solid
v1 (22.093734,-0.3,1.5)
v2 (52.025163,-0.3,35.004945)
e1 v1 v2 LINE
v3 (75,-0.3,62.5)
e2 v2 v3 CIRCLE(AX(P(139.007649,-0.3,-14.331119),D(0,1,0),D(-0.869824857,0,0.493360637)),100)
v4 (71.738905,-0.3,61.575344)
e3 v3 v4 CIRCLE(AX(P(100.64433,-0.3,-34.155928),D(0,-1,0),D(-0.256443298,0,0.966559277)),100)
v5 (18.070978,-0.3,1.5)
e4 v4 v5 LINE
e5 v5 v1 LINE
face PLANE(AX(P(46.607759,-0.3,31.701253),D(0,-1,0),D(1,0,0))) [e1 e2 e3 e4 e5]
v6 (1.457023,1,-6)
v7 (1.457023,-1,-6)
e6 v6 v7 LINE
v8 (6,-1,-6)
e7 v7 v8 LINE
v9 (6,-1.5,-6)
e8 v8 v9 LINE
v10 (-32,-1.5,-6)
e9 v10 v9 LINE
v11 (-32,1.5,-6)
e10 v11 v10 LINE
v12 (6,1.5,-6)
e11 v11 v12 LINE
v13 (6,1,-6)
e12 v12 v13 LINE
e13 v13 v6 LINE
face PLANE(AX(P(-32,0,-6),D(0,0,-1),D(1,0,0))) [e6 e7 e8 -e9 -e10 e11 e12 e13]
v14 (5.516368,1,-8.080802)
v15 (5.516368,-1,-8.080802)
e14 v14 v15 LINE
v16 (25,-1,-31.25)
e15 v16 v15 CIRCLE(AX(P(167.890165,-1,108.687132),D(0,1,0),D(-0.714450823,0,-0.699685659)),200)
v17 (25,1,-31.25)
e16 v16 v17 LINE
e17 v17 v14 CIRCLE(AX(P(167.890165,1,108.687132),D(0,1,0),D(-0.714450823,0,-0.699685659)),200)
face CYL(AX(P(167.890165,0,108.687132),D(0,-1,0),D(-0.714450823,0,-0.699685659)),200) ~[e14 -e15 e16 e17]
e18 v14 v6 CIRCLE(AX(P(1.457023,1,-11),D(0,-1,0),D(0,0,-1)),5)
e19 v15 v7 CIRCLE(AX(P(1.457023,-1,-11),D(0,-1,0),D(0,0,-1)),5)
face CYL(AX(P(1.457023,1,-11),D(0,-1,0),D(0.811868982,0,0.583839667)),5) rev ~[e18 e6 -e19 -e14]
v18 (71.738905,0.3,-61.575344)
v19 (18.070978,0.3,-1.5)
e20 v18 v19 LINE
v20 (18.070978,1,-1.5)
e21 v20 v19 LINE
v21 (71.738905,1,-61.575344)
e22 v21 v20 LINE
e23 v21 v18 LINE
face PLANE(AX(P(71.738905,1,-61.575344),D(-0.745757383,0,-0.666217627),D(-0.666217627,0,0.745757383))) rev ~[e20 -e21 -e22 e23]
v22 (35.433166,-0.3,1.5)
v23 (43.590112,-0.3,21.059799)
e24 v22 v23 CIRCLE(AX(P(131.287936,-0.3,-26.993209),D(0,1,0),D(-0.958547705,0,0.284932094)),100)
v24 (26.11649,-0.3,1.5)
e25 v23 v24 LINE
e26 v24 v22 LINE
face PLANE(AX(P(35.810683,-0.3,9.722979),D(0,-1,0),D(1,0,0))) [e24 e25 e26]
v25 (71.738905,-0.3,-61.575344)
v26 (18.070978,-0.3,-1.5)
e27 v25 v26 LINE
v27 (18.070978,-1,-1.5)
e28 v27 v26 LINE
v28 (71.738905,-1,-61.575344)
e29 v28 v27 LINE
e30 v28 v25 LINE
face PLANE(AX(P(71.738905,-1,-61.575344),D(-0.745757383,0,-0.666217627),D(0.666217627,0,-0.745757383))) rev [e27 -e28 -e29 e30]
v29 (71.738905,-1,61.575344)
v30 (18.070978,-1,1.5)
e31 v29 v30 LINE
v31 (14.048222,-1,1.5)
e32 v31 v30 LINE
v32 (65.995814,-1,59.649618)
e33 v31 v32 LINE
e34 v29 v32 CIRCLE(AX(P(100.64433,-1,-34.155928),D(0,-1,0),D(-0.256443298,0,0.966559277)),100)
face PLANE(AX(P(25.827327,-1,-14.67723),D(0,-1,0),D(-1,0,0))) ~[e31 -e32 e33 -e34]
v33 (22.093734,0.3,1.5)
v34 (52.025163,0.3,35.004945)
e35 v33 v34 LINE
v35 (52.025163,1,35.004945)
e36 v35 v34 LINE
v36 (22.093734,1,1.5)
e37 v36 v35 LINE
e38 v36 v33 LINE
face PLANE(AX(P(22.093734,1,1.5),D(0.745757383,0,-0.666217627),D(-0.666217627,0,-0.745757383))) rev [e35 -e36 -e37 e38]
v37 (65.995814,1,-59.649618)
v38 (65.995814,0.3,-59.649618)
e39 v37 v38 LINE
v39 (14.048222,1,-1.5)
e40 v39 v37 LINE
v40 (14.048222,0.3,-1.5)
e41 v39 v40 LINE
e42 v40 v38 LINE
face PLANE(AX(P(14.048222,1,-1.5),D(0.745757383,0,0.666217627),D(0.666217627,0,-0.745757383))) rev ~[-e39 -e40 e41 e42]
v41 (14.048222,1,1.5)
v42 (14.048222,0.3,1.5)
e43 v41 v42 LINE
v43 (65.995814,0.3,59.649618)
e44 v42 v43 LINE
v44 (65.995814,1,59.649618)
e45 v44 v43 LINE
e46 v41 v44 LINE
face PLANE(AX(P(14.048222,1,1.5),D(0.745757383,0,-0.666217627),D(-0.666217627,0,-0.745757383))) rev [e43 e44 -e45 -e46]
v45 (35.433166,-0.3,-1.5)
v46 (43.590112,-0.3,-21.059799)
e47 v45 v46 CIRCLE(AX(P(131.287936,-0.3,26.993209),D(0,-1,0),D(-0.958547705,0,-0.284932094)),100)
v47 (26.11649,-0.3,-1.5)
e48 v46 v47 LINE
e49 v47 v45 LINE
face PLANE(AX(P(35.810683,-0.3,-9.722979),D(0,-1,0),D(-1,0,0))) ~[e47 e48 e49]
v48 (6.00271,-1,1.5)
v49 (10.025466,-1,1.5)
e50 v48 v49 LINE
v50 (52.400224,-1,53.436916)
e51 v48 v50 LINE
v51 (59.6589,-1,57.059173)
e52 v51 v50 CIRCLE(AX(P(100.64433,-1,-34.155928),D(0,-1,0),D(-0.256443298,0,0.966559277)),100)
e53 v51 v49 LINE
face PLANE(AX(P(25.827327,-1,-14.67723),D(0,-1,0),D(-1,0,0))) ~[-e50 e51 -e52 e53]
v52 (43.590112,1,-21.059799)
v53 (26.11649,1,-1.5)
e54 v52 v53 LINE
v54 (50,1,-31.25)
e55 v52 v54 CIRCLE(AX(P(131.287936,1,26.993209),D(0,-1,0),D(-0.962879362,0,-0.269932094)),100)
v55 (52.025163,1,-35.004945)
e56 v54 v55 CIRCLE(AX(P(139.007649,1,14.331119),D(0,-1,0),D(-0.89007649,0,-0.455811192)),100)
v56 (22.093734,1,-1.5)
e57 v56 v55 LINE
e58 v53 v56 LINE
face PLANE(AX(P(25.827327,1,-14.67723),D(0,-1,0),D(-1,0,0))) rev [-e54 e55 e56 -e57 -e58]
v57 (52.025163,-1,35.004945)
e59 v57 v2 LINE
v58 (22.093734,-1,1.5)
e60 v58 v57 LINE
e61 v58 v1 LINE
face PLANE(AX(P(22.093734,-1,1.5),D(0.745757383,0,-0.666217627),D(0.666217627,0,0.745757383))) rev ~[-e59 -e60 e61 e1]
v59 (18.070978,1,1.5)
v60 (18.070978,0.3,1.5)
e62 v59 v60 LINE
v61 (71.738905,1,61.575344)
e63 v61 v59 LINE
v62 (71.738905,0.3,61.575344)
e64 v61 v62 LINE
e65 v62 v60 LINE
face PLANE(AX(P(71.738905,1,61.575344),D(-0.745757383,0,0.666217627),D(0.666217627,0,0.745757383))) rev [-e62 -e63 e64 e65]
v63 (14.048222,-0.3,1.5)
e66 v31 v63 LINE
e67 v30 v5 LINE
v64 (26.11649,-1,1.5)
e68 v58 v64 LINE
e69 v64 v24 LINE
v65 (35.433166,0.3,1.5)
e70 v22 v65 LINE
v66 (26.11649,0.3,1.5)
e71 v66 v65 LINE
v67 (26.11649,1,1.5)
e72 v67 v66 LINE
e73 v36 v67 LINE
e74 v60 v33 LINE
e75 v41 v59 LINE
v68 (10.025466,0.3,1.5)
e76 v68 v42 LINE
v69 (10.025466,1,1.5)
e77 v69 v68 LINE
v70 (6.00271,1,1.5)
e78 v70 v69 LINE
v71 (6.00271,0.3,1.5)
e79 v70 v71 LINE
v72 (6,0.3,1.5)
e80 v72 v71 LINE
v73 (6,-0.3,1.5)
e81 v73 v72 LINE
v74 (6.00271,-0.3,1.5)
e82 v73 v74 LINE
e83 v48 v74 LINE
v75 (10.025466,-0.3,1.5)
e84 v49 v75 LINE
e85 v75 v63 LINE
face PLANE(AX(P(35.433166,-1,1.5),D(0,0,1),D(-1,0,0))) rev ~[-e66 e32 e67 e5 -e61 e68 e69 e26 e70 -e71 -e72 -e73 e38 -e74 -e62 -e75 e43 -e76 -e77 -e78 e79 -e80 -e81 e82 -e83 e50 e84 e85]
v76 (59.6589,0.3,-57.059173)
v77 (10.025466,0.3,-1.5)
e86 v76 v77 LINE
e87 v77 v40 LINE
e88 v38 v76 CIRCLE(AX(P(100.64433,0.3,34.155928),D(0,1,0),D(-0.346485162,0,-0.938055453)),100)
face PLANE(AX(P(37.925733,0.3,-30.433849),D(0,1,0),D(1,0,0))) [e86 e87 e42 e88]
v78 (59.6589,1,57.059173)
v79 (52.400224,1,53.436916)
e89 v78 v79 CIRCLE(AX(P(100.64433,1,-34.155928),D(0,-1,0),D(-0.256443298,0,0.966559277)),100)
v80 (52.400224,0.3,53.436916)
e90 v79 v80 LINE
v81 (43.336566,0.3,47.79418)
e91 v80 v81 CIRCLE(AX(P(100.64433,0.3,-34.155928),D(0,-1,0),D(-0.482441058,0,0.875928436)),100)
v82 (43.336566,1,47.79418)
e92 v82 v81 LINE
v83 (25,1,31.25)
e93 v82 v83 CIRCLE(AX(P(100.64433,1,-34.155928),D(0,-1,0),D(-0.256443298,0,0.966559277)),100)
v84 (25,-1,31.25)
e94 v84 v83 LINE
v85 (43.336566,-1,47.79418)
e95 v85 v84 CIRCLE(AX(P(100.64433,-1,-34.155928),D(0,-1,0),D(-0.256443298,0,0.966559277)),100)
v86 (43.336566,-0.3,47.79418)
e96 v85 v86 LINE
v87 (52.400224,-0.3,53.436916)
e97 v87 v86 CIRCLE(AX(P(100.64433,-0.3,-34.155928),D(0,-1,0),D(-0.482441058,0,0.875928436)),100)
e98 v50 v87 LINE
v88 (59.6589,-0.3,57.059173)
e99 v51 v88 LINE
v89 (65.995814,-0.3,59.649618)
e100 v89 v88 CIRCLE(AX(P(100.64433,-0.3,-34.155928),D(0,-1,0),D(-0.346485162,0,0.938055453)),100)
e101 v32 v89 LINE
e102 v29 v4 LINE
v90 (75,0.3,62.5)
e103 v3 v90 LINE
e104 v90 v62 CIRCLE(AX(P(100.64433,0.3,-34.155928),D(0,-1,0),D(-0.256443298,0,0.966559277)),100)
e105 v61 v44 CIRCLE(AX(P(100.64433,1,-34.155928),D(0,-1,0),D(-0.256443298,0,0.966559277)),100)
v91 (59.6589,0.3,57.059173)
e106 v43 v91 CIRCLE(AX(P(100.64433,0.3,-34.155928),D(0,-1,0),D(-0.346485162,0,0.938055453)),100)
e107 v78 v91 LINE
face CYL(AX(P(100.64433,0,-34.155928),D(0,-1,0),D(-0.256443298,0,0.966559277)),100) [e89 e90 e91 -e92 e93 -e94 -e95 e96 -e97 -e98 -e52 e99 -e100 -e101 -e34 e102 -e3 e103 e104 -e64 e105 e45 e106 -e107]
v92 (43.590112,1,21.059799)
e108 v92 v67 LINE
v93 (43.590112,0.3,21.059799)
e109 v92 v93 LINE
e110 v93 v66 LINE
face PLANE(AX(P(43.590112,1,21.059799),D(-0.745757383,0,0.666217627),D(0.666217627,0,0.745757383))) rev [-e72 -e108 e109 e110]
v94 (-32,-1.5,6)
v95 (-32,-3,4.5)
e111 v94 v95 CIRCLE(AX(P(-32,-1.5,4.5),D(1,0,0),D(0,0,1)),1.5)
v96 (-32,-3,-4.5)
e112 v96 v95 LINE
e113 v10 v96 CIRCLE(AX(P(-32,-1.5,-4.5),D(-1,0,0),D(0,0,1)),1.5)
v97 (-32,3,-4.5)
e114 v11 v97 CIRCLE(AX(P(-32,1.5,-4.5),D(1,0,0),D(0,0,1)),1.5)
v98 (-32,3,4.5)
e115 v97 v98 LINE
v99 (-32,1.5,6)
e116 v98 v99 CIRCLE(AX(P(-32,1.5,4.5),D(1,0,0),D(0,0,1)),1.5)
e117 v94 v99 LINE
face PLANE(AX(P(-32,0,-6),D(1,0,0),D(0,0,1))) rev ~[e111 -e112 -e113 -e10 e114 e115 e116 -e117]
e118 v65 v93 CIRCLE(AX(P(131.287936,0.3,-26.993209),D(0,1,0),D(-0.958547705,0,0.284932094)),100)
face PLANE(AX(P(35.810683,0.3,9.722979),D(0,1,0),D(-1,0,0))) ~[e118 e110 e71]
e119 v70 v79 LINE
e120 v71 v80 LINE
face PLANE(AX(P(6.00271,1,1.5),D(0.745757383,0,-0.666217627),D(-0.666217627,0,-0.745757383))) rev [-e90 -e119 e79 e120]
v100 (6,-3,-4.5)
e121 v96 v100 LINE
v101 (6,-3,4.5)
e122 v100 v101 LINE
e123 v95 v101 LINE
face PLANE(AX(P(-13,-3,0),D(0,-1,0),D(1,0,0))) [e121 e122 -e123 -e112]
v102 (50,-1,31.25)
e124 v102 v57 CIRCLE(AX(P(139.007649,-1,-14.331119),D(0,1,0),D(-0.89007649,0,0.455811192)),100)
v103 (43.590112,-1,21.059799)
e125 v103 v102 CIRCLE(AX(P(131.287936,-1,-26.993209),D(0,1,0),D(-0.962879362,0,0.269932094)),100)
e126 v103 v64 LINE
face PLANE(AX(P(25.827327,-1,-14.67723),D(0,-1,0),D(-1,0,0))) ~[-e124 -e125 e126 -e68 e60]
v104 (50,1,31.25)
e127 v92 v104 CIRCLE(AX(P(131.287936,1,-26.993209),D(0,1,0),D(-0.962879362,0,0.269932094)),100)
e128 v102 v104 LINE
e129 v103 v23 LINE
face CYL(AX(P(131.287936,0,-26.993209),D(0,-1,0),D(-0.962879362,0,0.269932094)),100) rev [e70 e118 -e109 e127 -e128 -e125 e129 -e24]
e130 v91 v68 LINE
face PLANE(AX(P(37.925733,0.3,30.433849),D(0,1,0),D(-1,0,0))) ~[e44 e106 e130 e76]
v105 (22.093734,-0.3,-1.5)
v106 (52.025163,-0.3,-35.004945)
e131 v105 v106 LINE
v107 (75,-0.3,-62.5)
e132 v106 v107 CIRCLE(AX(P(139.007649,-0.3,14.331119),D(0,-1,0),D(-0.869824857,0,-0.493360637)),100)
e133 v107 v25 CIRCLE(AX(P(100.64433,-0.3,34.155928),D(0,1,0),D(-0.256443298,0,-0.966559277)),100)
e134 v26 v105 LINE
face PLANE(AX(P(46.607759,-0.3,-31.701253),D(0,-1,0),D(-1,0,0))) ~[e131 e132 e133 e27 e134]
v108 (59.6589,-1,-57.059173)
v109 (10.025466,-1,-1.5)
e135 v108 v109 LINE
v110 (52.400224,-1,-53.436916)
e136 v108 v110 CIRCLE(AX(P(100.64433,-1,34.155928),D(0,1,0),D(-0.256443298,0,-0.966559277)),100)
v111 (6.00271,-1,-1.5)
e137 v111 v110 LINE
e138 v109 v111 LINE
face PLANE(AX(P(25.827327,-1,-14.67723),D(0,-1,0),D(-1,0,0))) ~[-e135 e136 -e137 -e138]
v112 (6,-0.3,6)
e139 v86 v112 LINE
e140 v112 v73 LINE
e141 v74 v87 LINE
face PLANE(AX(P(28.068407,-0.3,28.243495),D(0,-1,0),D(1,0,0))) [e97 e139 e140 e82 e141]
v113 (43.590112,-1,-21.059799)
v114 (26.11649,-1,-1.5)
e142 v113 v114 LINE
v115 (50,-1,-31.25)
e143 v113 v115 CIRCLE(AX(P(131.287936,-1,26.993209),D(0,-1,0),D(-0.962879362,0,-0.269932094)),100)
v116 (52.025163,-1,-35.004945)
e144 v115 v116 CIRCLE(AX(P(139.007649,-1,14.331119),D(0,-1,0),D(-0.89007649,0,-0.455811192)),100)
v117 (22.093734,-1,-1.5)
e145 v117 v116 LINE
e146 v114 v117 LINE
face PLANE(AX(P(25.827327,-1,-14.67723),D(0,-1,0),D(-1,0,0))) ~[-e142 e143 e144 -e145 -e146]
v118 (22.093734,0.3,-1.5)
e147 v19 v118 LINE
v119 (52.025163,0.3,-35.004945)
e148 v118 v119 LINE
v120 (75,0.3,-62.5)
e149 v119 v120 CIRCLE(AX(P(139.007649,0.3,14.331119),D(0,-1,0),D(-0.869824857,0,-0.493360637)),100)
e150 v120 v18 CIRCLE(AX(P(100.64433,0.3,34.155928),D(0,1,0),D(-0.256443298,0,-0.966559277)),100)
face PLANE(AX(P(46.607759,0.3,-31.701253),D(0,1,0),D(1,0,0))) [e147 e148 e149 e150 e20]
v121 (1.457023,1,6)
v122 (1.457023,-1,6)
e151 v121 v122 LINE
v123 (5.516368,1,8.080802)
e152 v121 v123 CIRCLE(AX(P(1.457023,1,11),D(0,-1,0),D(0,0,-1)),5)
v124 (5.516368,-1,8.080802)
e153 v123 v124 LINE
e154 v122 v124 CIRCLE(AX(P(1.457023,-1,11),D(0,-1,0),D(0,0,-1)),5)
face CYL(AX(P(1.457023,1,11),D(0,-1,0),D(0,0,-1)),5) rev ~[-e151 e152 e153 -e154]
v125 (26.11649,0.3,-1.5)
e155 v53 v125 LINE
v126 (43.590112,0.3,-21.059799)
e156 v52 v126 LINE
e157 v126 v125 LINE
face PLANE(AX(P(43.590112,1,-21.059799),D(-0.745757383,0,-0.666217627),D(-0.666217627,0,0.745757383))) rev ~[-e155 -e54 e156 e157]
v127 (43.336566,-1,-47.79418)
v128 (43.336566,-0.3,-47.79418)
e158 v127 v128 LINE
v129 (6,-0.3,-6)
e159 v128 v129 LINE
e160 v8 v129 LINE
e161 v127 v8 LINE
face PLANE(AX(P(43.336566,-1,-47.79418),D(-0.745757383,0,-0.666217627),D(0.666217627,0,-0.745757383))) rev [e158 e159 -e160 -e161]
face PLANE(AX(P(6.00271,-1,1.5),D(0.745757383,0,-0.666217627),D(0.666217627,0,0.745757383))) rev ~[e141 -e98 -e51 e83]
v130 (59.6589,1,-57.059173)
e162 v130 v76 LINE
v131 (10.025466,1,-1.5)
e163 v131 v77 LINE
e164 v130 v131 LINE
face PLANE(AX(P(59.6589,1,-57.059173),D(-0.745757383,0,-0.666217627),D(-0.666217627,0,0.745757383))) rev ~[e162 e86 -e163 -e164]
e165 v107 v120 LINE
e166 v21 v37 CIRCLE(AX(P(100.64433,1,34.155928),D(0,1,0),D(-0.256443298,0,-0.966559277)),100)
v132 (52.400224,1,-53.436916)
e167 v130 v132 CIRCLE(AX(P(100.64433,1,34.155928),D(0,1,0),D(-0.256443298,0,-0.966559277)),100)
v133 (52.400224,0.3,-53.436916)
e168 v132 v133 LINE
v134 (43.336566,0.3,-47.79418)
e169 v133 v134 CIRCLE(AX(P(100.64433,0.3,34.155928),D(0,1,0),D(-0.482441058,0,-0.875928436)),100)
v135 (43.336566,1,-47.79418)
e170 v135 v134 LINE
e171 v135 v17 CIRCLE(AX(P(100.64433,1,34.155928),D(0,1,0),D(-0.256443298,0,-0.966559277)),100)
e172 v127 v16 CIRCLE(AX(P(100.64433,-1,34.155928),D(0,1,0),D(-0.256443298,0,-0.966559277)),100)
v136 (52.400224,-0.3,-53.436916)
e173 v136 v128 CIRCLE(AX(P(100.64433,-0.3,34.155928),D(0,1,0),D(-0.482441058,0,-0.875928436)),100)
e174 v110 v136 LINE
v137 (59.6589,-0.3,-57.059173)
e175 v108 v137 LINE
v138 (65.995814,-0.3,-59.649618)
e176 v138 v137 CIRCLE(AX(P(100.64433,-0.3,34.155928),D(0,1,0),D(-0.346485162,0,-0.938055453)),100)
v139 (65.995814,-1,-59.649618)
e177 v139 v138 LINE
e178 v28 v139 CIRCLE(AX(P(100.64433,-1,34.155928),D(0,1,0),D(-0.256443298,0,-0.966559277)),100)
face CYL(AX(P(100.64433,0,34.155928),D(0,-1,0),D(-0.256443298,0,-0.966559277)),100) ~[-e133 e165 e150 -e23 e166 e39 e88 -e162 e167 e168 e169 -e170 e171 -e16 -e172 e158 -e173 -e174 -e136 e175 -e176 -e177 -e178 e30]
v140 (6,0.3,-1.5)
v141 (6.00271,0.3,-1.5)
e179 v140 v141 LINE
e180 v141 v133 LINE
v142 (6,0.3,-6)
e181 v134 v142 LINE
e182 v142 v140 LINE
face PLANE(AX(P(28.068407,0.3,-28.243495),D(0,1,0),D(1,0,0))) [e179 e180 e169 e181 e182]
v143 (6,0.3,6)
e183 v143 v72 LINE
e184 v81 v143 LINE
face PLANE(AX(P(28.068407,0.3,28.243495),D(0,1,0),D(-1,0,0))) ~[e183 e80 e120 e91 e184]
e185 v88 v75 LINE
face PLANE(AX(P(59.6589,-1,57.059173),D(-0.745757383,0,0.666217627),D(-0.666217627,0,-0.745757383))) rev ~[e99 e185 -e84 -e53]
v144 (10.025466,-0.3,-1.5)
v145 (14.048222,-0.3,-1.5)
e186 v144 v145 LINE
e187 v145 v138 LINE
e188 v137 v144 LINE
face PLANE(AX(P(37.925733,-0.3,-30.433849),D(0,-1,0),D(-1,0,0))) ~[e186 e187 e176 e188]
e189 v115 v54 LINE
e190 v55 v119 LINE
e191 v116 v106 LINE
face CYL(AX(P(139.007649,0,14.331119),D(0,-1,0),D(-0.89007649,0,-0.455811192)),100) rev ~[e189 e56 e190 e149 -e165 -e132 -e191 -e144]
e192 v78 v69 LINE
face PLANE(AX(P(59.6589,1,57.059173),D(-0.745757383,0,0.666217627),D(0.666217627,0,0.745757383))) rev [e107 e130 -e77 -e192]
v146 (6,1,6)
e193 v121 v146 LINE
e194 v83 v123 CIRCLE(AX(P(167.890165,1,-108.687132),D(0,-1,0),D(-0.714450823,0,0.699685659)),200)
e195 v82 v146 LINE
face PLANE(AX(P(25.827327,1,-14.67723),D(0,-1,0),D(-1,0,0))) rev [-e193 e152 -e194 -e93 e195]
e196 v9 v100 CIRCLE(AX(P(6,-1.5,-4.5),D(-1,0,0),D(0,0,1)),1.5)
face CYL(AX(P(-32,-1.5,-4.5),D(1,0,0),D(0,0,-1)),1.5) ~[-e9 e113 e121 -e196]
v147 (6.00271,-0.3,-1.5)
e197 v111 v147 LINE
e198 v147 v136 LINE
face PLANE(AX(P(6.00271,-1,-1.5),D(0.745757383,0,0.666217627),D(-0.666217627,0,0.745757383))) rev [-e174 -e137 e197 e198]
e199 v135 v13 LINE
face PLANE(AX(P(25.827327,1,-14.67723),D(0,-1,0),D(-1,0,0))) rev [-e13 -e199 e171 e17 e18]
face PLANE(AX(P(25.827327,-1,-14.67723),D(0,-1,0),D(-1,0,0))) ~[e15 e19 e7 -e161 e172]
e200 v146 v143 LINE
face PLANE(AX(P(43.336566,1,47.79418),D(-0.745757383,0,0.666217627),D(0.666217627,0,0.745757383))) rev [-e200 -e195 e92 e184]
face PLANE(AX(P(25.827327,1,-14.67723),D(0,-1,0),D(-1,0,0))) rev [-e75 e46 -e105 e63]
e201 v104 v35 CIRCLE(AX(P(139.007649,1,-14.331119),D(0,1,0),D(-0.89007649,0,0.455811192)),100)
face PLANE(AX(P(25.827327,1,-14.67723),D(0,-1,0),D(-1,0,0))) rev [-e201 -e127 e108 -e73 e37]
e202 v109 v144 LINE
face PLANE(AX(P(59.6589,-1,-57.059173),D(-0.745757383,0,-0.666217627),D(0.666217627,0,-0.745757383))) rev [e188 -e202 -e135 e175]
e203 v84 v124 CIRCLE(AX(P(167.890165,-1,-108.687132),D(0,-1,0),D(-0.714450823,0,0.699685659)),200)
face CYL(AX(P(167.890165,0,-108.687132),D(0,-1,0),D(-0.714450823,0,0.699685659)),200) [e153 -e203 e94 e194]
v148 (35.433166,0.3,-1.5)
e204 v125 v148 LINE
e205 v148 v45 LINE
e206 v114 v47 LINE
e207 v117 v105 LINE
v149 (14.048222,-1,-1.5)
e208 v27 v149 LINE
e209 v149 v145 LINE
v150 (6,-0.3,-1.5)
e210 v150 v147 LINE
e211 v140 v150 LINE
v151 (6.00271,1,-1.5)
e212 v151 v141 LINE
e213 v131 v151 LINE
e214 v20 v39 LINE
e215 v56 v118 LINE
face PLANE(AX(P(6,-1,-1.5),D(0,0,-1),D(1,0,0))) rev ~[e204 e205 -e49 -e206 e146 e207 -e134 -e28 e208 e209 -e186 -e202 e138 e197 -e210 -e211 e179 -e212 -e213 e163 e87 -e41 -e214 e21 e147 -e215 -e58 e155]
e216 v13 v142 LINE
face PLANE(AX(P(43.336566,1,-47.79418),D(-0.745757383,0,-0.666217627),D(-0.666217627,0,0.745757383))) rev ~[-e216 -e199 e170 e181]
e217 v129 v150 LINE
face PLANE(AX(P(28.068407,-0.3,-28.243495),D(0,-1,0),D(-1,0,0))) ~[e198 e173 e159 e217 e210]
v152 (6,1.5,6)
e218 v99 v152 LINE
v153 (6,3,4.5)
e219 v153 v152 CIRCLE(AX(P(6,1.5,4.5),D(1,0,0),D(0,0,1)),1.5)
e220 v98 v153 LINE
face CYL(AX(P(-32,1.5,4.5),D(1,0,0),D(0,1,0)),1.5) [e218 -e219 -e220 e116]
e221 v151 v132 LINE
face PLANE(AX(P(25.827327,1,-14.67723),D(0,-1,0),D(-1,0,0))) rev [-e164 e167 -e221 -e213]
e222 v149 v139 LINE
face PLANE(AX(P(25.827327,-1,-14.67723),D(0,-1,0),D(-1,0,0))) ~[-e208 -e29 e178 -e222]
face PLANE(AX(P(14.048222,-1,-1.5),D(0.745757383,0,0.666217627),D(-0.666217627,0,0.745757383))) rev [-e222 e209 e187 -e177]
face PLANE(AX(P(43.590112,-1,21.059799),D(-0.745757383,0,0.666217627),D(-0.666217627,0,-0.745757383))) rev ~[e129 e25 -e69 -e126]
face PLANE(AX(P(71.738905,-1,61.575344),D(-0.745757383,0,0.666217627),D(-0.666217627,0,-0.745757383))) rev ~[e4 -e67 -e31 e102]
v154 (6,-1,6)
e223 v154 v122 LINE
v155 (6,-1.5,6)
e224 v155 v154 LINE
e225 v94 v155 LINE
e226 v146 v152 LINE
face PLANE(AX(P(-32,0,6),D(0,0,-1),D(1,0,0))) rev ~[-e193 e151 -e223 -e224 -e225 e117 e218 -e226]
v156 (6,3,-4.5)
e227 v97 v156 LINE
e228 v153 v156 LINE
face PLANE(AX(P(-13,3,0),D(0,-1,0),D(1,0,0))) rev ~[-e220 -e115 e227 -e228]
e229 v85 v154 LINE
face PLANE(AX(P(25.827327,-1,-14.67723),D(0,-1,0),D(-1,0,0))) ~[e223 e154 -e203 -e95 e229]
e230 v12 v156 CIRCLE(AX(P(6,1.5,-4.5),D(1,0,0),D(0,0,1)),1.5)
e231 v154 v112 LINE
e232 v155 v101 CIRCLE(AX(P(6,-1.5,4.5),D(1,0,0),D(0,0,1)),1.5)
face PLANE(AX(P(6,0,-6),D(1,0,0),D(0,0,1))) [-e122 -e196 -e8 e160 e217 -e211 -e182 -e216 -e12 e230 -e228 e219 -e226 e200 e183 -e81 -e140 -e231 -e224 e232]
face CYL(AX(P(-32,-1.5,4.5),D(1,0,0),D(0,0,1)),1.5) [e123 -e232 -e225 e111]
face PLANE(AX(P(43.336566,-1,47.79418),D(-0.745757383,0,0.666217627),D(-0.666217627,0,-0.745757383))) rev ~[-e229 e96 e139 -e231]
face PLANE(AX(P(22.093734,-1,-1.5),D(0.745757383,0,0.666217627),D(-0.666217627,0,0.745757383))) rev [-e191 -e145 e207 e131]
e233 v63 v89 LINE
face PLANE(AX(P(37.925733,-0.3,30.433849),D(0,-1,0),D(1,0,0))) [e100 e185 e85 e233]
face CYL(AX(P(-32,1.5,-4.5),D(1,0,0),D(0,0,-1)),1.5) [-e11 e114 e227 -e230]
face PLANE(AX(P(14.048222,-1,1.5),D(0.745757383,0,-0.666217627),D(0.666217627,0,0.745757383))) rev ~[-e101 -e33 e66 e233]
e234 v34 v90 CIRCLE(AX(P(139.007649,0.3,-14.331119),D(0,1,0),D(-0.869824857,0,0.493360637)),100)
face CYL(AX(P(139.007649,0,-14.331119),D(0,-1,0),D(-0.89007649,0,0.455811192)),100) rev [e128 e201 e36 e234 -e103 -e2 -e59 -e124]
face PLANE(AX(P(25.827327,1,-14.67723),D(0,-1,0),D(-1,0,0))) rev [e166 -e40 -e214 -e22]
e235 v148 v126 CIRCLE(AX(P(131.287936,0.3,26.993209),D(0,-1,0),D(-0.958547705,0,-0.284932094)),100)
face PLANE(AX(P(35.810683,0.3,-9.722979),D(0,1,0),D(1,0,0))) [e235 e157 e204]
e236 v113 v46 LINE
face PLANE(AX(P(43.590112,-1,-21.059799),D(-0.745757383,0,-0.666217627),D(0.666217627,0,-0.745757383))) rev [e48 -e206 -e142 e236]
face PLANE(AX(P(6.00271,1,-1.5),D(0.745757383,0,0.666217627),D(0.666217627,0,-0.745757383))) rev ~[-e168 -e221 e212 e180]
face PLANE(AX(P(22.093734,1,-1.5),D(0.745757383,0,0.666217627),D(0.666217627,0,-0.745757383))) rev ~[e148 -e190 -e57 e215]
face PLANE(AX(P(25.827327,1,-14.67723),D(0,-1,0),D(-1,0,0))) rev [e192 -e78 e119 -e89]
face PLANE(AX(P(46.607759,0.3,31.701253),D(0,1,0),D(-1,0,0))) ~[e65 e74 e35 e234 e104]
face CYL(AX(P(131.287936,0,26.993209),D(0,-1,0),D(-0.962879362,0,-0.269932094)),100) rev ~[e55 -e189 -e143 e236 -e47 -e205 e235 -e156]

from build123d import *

# Parameters (mm, degrees)
F1_DEPTH         = 1
F3_W             = 38
F3_H             = 12
F4_DEPTH         = 3
F5_R             = 1.5
F7_DEPTH         = 0.7
F7_COPIES2_COUNT = 2
F9_DEPTH         = 12.5
F10_R            = 5


# Not quite as in the source:
# - a pattern or mirror of a feature is missing from the dataset's text; its kind, count and spacing are read off the source's solid


with BuildPart() as f1:
    # F0 (on Front) → F1 (new body, symmetric)
    with BuildSketch(Plane.XZ):
        with BuildLine():
            ThreePointArc((25, 31.25), (11.7164027855, 16.2518777716), (0, 0))
            Line((0, 0), (35, 0))
            ThreePointArc((35, 0), (41.1356304071, 16.2798974046), (50, 31.25))
            Line((50, 31.25), (25, 31.25))
        make_face()
        with BuildLine():
            ThreePointArc((75, 62.5), (47.6444357815, 50.6439027497), (25, 31.25))
            Line((25, 31.25), (50, 31.25))
            ThreePointArc((50, 31.25), (60.9207680237, 48.138385581), (75, 62.5))
        make_face()
    extrude(amount=F1_DEPTH, both=True)

    # F2: F1 across plane


with BuildPart() as f1_1:
    add(f1.part)
    add(f1.part.mirror(Plane.XY))

    # F3 (on Front) → F4 (join, symmetric)
    with BuildSketch(Plane.XZ):
        with Locations((-13, 0)):
            Rectangle(F3_W, F3_H)
    extrude(amount=F4_DEPTH, both=True)

    # F5
    f5_edges = [f1_1.edges().sort_by_distance(p)[0] for p in [
        (-13, 3, 6),
        (-13, -3, 6),
        (-13, -3, -6),
        (-13, 3, -6),
    ]]
    fillet(f5_edges, radius=F5_R)

    # F6 (on face) → F7 (cut)
    with BuildSketch(Plane.XZ.offset(1)):
        with BuildLine():
            Line((43.3365657685, 47.794180243), (6, 6))
            Line((6, 6), (6, 1.5))
            Line((6, 1.5), (6.0027095677, 1.5))
            Line((6.0027095677, 1.5), (52.4002239395, 53.436915958))
            ThreePointArc((52.4002239395, 53.436915958), (47.7930343948, 50.7365960242), (43.3365657685, 47.794180243))
        make_face()
        with BuildLine():
            ThreePointArc((65.9958136081, 59.6496176381), (62.8051828619, 58.40863879), (59.6589001751, 57.0591728532))
            Line((59.6589001751, 57.0591728532), (10.0254655864, 1.5))
            Line((10.0254655864, 1.5), (14.0482216051, 1.5))
            Line((14.0482216051, 1.5), (65.9958136081, 59.6496176381))
        make_face()
        with BuildLine():
            ThreePointArc((75, 62.5), (73.3655345805, 62.0514906305), (71.738905371, 61.5753443538))
            Line((71.738905371, 61.5753443538), (18.0709776237, 1.5))
            Line((18.0709776237, 1.5), (22.0937336424, 1.5))
            Line((22.0937336424, 1.5), (52.0251632611, 35.0049445138))
            ThreePointArc((52.0251632611, 35.0049445138), (62.2710885073, 49.7898624827), (75, 62.5))
        make_face()
        with BuildLine():
            Line((43.5901115949, 21.0597985398), (26.1164896611, 1.5))
            Line((26.1164896611, 1.5), (35.4331656898, 1.5))
            ThreePointArc((35.4331656898, 1.5), (38.9920250058, 11.4965917024), (43.5901115949, 21.0597985398))
        make_face()
    f7 = extrude(amount=-F7_DEPTH, mode=Mode.SUBTRACT)

    # F7_copies: F7 across plane
    add(f7.mirror(Plane.ZX), mode=Mode.SUBTRACT)

    # F7_copies1: F7 across plane
    add(f7.mirror(Plane(origin=(0, 0, 0), x_dir=(-1, 0, 0), z_dir=(0, 0, -1))), mode=Mode.SUBTRACT)

    # F7_copies2: F7 ×2 about axis
    f7_copies2_axis = Axis((0, 0, 0), (1, 0, 0))
    for i in range(1, F7_COPIES2_COUNT):
        add(f7.rotate(f7_copies2_axis, i * 360 / F7_COPIES2_COUNT), mode=Mode.SUBTRACT)

    # F8 (on face) → F9 (cut, symmetric)
    with BuildSketch(Plane.XZ.offset(1)):
        with BuildLine():
            Line((6.0027095677, 1.5), (6, 1.5))
            Line((6, 1.5), (6, -1.5))
            Line((6, -1.5), (6.0027095677, -1.5))
            Line((6.0027095677, -1.5), (10.0254655864, -1.5))
            Line((10.0254655864, -1.5), (14.0482216051, -1.5))
            Line((14.0482216051, -1.5), (18.0709776237, -1.5))
            Line((18.0709776237, -1.5), (22.0937336424, -1.5))
            Line((22.0937336424, -1.5), (26.1164896611, -1.5))
            Line((26.1164896611, -1.5), (35.4331656898, -1.5))
            ThreePointArc((35.4331656898, -1.5), (35.2136553779, -0.7508453855), (35, 0))
            ThreePointArc((35, 0), (35.2136553779, 0.7508453855), (35.4331656898, 1.5))
            Line((35.4331656898, 1.5), (26.1164896611, 1.5))
            Line((26.1164896611, 1.5), (22.0937336424, 1.5))
            Line((22.0937336424, 1.5), (18.0709776237, 1.5))
            Line((18.0709776237, 1.5), (14.0482216051, 1.5))
            Line((14.0482216051, 1.5), (10.0254655864, 1.5))
            Line((10.0254655864, 1.5), (6.0027095677, 1.5))
        make_face()
    extrude(amount=F9_DEPTH, both=True, mode=Mode.SUBTRACT)

    # F10
    f10_edges = [f1_1.edges().sort_by_distance(p)[0] for p in [
        (4.040045, 0, 6),
        (4.040045, 0, -6),
    ]]
    fillet(f10_edges, radius=F10_R)


solid = f1_1.part
